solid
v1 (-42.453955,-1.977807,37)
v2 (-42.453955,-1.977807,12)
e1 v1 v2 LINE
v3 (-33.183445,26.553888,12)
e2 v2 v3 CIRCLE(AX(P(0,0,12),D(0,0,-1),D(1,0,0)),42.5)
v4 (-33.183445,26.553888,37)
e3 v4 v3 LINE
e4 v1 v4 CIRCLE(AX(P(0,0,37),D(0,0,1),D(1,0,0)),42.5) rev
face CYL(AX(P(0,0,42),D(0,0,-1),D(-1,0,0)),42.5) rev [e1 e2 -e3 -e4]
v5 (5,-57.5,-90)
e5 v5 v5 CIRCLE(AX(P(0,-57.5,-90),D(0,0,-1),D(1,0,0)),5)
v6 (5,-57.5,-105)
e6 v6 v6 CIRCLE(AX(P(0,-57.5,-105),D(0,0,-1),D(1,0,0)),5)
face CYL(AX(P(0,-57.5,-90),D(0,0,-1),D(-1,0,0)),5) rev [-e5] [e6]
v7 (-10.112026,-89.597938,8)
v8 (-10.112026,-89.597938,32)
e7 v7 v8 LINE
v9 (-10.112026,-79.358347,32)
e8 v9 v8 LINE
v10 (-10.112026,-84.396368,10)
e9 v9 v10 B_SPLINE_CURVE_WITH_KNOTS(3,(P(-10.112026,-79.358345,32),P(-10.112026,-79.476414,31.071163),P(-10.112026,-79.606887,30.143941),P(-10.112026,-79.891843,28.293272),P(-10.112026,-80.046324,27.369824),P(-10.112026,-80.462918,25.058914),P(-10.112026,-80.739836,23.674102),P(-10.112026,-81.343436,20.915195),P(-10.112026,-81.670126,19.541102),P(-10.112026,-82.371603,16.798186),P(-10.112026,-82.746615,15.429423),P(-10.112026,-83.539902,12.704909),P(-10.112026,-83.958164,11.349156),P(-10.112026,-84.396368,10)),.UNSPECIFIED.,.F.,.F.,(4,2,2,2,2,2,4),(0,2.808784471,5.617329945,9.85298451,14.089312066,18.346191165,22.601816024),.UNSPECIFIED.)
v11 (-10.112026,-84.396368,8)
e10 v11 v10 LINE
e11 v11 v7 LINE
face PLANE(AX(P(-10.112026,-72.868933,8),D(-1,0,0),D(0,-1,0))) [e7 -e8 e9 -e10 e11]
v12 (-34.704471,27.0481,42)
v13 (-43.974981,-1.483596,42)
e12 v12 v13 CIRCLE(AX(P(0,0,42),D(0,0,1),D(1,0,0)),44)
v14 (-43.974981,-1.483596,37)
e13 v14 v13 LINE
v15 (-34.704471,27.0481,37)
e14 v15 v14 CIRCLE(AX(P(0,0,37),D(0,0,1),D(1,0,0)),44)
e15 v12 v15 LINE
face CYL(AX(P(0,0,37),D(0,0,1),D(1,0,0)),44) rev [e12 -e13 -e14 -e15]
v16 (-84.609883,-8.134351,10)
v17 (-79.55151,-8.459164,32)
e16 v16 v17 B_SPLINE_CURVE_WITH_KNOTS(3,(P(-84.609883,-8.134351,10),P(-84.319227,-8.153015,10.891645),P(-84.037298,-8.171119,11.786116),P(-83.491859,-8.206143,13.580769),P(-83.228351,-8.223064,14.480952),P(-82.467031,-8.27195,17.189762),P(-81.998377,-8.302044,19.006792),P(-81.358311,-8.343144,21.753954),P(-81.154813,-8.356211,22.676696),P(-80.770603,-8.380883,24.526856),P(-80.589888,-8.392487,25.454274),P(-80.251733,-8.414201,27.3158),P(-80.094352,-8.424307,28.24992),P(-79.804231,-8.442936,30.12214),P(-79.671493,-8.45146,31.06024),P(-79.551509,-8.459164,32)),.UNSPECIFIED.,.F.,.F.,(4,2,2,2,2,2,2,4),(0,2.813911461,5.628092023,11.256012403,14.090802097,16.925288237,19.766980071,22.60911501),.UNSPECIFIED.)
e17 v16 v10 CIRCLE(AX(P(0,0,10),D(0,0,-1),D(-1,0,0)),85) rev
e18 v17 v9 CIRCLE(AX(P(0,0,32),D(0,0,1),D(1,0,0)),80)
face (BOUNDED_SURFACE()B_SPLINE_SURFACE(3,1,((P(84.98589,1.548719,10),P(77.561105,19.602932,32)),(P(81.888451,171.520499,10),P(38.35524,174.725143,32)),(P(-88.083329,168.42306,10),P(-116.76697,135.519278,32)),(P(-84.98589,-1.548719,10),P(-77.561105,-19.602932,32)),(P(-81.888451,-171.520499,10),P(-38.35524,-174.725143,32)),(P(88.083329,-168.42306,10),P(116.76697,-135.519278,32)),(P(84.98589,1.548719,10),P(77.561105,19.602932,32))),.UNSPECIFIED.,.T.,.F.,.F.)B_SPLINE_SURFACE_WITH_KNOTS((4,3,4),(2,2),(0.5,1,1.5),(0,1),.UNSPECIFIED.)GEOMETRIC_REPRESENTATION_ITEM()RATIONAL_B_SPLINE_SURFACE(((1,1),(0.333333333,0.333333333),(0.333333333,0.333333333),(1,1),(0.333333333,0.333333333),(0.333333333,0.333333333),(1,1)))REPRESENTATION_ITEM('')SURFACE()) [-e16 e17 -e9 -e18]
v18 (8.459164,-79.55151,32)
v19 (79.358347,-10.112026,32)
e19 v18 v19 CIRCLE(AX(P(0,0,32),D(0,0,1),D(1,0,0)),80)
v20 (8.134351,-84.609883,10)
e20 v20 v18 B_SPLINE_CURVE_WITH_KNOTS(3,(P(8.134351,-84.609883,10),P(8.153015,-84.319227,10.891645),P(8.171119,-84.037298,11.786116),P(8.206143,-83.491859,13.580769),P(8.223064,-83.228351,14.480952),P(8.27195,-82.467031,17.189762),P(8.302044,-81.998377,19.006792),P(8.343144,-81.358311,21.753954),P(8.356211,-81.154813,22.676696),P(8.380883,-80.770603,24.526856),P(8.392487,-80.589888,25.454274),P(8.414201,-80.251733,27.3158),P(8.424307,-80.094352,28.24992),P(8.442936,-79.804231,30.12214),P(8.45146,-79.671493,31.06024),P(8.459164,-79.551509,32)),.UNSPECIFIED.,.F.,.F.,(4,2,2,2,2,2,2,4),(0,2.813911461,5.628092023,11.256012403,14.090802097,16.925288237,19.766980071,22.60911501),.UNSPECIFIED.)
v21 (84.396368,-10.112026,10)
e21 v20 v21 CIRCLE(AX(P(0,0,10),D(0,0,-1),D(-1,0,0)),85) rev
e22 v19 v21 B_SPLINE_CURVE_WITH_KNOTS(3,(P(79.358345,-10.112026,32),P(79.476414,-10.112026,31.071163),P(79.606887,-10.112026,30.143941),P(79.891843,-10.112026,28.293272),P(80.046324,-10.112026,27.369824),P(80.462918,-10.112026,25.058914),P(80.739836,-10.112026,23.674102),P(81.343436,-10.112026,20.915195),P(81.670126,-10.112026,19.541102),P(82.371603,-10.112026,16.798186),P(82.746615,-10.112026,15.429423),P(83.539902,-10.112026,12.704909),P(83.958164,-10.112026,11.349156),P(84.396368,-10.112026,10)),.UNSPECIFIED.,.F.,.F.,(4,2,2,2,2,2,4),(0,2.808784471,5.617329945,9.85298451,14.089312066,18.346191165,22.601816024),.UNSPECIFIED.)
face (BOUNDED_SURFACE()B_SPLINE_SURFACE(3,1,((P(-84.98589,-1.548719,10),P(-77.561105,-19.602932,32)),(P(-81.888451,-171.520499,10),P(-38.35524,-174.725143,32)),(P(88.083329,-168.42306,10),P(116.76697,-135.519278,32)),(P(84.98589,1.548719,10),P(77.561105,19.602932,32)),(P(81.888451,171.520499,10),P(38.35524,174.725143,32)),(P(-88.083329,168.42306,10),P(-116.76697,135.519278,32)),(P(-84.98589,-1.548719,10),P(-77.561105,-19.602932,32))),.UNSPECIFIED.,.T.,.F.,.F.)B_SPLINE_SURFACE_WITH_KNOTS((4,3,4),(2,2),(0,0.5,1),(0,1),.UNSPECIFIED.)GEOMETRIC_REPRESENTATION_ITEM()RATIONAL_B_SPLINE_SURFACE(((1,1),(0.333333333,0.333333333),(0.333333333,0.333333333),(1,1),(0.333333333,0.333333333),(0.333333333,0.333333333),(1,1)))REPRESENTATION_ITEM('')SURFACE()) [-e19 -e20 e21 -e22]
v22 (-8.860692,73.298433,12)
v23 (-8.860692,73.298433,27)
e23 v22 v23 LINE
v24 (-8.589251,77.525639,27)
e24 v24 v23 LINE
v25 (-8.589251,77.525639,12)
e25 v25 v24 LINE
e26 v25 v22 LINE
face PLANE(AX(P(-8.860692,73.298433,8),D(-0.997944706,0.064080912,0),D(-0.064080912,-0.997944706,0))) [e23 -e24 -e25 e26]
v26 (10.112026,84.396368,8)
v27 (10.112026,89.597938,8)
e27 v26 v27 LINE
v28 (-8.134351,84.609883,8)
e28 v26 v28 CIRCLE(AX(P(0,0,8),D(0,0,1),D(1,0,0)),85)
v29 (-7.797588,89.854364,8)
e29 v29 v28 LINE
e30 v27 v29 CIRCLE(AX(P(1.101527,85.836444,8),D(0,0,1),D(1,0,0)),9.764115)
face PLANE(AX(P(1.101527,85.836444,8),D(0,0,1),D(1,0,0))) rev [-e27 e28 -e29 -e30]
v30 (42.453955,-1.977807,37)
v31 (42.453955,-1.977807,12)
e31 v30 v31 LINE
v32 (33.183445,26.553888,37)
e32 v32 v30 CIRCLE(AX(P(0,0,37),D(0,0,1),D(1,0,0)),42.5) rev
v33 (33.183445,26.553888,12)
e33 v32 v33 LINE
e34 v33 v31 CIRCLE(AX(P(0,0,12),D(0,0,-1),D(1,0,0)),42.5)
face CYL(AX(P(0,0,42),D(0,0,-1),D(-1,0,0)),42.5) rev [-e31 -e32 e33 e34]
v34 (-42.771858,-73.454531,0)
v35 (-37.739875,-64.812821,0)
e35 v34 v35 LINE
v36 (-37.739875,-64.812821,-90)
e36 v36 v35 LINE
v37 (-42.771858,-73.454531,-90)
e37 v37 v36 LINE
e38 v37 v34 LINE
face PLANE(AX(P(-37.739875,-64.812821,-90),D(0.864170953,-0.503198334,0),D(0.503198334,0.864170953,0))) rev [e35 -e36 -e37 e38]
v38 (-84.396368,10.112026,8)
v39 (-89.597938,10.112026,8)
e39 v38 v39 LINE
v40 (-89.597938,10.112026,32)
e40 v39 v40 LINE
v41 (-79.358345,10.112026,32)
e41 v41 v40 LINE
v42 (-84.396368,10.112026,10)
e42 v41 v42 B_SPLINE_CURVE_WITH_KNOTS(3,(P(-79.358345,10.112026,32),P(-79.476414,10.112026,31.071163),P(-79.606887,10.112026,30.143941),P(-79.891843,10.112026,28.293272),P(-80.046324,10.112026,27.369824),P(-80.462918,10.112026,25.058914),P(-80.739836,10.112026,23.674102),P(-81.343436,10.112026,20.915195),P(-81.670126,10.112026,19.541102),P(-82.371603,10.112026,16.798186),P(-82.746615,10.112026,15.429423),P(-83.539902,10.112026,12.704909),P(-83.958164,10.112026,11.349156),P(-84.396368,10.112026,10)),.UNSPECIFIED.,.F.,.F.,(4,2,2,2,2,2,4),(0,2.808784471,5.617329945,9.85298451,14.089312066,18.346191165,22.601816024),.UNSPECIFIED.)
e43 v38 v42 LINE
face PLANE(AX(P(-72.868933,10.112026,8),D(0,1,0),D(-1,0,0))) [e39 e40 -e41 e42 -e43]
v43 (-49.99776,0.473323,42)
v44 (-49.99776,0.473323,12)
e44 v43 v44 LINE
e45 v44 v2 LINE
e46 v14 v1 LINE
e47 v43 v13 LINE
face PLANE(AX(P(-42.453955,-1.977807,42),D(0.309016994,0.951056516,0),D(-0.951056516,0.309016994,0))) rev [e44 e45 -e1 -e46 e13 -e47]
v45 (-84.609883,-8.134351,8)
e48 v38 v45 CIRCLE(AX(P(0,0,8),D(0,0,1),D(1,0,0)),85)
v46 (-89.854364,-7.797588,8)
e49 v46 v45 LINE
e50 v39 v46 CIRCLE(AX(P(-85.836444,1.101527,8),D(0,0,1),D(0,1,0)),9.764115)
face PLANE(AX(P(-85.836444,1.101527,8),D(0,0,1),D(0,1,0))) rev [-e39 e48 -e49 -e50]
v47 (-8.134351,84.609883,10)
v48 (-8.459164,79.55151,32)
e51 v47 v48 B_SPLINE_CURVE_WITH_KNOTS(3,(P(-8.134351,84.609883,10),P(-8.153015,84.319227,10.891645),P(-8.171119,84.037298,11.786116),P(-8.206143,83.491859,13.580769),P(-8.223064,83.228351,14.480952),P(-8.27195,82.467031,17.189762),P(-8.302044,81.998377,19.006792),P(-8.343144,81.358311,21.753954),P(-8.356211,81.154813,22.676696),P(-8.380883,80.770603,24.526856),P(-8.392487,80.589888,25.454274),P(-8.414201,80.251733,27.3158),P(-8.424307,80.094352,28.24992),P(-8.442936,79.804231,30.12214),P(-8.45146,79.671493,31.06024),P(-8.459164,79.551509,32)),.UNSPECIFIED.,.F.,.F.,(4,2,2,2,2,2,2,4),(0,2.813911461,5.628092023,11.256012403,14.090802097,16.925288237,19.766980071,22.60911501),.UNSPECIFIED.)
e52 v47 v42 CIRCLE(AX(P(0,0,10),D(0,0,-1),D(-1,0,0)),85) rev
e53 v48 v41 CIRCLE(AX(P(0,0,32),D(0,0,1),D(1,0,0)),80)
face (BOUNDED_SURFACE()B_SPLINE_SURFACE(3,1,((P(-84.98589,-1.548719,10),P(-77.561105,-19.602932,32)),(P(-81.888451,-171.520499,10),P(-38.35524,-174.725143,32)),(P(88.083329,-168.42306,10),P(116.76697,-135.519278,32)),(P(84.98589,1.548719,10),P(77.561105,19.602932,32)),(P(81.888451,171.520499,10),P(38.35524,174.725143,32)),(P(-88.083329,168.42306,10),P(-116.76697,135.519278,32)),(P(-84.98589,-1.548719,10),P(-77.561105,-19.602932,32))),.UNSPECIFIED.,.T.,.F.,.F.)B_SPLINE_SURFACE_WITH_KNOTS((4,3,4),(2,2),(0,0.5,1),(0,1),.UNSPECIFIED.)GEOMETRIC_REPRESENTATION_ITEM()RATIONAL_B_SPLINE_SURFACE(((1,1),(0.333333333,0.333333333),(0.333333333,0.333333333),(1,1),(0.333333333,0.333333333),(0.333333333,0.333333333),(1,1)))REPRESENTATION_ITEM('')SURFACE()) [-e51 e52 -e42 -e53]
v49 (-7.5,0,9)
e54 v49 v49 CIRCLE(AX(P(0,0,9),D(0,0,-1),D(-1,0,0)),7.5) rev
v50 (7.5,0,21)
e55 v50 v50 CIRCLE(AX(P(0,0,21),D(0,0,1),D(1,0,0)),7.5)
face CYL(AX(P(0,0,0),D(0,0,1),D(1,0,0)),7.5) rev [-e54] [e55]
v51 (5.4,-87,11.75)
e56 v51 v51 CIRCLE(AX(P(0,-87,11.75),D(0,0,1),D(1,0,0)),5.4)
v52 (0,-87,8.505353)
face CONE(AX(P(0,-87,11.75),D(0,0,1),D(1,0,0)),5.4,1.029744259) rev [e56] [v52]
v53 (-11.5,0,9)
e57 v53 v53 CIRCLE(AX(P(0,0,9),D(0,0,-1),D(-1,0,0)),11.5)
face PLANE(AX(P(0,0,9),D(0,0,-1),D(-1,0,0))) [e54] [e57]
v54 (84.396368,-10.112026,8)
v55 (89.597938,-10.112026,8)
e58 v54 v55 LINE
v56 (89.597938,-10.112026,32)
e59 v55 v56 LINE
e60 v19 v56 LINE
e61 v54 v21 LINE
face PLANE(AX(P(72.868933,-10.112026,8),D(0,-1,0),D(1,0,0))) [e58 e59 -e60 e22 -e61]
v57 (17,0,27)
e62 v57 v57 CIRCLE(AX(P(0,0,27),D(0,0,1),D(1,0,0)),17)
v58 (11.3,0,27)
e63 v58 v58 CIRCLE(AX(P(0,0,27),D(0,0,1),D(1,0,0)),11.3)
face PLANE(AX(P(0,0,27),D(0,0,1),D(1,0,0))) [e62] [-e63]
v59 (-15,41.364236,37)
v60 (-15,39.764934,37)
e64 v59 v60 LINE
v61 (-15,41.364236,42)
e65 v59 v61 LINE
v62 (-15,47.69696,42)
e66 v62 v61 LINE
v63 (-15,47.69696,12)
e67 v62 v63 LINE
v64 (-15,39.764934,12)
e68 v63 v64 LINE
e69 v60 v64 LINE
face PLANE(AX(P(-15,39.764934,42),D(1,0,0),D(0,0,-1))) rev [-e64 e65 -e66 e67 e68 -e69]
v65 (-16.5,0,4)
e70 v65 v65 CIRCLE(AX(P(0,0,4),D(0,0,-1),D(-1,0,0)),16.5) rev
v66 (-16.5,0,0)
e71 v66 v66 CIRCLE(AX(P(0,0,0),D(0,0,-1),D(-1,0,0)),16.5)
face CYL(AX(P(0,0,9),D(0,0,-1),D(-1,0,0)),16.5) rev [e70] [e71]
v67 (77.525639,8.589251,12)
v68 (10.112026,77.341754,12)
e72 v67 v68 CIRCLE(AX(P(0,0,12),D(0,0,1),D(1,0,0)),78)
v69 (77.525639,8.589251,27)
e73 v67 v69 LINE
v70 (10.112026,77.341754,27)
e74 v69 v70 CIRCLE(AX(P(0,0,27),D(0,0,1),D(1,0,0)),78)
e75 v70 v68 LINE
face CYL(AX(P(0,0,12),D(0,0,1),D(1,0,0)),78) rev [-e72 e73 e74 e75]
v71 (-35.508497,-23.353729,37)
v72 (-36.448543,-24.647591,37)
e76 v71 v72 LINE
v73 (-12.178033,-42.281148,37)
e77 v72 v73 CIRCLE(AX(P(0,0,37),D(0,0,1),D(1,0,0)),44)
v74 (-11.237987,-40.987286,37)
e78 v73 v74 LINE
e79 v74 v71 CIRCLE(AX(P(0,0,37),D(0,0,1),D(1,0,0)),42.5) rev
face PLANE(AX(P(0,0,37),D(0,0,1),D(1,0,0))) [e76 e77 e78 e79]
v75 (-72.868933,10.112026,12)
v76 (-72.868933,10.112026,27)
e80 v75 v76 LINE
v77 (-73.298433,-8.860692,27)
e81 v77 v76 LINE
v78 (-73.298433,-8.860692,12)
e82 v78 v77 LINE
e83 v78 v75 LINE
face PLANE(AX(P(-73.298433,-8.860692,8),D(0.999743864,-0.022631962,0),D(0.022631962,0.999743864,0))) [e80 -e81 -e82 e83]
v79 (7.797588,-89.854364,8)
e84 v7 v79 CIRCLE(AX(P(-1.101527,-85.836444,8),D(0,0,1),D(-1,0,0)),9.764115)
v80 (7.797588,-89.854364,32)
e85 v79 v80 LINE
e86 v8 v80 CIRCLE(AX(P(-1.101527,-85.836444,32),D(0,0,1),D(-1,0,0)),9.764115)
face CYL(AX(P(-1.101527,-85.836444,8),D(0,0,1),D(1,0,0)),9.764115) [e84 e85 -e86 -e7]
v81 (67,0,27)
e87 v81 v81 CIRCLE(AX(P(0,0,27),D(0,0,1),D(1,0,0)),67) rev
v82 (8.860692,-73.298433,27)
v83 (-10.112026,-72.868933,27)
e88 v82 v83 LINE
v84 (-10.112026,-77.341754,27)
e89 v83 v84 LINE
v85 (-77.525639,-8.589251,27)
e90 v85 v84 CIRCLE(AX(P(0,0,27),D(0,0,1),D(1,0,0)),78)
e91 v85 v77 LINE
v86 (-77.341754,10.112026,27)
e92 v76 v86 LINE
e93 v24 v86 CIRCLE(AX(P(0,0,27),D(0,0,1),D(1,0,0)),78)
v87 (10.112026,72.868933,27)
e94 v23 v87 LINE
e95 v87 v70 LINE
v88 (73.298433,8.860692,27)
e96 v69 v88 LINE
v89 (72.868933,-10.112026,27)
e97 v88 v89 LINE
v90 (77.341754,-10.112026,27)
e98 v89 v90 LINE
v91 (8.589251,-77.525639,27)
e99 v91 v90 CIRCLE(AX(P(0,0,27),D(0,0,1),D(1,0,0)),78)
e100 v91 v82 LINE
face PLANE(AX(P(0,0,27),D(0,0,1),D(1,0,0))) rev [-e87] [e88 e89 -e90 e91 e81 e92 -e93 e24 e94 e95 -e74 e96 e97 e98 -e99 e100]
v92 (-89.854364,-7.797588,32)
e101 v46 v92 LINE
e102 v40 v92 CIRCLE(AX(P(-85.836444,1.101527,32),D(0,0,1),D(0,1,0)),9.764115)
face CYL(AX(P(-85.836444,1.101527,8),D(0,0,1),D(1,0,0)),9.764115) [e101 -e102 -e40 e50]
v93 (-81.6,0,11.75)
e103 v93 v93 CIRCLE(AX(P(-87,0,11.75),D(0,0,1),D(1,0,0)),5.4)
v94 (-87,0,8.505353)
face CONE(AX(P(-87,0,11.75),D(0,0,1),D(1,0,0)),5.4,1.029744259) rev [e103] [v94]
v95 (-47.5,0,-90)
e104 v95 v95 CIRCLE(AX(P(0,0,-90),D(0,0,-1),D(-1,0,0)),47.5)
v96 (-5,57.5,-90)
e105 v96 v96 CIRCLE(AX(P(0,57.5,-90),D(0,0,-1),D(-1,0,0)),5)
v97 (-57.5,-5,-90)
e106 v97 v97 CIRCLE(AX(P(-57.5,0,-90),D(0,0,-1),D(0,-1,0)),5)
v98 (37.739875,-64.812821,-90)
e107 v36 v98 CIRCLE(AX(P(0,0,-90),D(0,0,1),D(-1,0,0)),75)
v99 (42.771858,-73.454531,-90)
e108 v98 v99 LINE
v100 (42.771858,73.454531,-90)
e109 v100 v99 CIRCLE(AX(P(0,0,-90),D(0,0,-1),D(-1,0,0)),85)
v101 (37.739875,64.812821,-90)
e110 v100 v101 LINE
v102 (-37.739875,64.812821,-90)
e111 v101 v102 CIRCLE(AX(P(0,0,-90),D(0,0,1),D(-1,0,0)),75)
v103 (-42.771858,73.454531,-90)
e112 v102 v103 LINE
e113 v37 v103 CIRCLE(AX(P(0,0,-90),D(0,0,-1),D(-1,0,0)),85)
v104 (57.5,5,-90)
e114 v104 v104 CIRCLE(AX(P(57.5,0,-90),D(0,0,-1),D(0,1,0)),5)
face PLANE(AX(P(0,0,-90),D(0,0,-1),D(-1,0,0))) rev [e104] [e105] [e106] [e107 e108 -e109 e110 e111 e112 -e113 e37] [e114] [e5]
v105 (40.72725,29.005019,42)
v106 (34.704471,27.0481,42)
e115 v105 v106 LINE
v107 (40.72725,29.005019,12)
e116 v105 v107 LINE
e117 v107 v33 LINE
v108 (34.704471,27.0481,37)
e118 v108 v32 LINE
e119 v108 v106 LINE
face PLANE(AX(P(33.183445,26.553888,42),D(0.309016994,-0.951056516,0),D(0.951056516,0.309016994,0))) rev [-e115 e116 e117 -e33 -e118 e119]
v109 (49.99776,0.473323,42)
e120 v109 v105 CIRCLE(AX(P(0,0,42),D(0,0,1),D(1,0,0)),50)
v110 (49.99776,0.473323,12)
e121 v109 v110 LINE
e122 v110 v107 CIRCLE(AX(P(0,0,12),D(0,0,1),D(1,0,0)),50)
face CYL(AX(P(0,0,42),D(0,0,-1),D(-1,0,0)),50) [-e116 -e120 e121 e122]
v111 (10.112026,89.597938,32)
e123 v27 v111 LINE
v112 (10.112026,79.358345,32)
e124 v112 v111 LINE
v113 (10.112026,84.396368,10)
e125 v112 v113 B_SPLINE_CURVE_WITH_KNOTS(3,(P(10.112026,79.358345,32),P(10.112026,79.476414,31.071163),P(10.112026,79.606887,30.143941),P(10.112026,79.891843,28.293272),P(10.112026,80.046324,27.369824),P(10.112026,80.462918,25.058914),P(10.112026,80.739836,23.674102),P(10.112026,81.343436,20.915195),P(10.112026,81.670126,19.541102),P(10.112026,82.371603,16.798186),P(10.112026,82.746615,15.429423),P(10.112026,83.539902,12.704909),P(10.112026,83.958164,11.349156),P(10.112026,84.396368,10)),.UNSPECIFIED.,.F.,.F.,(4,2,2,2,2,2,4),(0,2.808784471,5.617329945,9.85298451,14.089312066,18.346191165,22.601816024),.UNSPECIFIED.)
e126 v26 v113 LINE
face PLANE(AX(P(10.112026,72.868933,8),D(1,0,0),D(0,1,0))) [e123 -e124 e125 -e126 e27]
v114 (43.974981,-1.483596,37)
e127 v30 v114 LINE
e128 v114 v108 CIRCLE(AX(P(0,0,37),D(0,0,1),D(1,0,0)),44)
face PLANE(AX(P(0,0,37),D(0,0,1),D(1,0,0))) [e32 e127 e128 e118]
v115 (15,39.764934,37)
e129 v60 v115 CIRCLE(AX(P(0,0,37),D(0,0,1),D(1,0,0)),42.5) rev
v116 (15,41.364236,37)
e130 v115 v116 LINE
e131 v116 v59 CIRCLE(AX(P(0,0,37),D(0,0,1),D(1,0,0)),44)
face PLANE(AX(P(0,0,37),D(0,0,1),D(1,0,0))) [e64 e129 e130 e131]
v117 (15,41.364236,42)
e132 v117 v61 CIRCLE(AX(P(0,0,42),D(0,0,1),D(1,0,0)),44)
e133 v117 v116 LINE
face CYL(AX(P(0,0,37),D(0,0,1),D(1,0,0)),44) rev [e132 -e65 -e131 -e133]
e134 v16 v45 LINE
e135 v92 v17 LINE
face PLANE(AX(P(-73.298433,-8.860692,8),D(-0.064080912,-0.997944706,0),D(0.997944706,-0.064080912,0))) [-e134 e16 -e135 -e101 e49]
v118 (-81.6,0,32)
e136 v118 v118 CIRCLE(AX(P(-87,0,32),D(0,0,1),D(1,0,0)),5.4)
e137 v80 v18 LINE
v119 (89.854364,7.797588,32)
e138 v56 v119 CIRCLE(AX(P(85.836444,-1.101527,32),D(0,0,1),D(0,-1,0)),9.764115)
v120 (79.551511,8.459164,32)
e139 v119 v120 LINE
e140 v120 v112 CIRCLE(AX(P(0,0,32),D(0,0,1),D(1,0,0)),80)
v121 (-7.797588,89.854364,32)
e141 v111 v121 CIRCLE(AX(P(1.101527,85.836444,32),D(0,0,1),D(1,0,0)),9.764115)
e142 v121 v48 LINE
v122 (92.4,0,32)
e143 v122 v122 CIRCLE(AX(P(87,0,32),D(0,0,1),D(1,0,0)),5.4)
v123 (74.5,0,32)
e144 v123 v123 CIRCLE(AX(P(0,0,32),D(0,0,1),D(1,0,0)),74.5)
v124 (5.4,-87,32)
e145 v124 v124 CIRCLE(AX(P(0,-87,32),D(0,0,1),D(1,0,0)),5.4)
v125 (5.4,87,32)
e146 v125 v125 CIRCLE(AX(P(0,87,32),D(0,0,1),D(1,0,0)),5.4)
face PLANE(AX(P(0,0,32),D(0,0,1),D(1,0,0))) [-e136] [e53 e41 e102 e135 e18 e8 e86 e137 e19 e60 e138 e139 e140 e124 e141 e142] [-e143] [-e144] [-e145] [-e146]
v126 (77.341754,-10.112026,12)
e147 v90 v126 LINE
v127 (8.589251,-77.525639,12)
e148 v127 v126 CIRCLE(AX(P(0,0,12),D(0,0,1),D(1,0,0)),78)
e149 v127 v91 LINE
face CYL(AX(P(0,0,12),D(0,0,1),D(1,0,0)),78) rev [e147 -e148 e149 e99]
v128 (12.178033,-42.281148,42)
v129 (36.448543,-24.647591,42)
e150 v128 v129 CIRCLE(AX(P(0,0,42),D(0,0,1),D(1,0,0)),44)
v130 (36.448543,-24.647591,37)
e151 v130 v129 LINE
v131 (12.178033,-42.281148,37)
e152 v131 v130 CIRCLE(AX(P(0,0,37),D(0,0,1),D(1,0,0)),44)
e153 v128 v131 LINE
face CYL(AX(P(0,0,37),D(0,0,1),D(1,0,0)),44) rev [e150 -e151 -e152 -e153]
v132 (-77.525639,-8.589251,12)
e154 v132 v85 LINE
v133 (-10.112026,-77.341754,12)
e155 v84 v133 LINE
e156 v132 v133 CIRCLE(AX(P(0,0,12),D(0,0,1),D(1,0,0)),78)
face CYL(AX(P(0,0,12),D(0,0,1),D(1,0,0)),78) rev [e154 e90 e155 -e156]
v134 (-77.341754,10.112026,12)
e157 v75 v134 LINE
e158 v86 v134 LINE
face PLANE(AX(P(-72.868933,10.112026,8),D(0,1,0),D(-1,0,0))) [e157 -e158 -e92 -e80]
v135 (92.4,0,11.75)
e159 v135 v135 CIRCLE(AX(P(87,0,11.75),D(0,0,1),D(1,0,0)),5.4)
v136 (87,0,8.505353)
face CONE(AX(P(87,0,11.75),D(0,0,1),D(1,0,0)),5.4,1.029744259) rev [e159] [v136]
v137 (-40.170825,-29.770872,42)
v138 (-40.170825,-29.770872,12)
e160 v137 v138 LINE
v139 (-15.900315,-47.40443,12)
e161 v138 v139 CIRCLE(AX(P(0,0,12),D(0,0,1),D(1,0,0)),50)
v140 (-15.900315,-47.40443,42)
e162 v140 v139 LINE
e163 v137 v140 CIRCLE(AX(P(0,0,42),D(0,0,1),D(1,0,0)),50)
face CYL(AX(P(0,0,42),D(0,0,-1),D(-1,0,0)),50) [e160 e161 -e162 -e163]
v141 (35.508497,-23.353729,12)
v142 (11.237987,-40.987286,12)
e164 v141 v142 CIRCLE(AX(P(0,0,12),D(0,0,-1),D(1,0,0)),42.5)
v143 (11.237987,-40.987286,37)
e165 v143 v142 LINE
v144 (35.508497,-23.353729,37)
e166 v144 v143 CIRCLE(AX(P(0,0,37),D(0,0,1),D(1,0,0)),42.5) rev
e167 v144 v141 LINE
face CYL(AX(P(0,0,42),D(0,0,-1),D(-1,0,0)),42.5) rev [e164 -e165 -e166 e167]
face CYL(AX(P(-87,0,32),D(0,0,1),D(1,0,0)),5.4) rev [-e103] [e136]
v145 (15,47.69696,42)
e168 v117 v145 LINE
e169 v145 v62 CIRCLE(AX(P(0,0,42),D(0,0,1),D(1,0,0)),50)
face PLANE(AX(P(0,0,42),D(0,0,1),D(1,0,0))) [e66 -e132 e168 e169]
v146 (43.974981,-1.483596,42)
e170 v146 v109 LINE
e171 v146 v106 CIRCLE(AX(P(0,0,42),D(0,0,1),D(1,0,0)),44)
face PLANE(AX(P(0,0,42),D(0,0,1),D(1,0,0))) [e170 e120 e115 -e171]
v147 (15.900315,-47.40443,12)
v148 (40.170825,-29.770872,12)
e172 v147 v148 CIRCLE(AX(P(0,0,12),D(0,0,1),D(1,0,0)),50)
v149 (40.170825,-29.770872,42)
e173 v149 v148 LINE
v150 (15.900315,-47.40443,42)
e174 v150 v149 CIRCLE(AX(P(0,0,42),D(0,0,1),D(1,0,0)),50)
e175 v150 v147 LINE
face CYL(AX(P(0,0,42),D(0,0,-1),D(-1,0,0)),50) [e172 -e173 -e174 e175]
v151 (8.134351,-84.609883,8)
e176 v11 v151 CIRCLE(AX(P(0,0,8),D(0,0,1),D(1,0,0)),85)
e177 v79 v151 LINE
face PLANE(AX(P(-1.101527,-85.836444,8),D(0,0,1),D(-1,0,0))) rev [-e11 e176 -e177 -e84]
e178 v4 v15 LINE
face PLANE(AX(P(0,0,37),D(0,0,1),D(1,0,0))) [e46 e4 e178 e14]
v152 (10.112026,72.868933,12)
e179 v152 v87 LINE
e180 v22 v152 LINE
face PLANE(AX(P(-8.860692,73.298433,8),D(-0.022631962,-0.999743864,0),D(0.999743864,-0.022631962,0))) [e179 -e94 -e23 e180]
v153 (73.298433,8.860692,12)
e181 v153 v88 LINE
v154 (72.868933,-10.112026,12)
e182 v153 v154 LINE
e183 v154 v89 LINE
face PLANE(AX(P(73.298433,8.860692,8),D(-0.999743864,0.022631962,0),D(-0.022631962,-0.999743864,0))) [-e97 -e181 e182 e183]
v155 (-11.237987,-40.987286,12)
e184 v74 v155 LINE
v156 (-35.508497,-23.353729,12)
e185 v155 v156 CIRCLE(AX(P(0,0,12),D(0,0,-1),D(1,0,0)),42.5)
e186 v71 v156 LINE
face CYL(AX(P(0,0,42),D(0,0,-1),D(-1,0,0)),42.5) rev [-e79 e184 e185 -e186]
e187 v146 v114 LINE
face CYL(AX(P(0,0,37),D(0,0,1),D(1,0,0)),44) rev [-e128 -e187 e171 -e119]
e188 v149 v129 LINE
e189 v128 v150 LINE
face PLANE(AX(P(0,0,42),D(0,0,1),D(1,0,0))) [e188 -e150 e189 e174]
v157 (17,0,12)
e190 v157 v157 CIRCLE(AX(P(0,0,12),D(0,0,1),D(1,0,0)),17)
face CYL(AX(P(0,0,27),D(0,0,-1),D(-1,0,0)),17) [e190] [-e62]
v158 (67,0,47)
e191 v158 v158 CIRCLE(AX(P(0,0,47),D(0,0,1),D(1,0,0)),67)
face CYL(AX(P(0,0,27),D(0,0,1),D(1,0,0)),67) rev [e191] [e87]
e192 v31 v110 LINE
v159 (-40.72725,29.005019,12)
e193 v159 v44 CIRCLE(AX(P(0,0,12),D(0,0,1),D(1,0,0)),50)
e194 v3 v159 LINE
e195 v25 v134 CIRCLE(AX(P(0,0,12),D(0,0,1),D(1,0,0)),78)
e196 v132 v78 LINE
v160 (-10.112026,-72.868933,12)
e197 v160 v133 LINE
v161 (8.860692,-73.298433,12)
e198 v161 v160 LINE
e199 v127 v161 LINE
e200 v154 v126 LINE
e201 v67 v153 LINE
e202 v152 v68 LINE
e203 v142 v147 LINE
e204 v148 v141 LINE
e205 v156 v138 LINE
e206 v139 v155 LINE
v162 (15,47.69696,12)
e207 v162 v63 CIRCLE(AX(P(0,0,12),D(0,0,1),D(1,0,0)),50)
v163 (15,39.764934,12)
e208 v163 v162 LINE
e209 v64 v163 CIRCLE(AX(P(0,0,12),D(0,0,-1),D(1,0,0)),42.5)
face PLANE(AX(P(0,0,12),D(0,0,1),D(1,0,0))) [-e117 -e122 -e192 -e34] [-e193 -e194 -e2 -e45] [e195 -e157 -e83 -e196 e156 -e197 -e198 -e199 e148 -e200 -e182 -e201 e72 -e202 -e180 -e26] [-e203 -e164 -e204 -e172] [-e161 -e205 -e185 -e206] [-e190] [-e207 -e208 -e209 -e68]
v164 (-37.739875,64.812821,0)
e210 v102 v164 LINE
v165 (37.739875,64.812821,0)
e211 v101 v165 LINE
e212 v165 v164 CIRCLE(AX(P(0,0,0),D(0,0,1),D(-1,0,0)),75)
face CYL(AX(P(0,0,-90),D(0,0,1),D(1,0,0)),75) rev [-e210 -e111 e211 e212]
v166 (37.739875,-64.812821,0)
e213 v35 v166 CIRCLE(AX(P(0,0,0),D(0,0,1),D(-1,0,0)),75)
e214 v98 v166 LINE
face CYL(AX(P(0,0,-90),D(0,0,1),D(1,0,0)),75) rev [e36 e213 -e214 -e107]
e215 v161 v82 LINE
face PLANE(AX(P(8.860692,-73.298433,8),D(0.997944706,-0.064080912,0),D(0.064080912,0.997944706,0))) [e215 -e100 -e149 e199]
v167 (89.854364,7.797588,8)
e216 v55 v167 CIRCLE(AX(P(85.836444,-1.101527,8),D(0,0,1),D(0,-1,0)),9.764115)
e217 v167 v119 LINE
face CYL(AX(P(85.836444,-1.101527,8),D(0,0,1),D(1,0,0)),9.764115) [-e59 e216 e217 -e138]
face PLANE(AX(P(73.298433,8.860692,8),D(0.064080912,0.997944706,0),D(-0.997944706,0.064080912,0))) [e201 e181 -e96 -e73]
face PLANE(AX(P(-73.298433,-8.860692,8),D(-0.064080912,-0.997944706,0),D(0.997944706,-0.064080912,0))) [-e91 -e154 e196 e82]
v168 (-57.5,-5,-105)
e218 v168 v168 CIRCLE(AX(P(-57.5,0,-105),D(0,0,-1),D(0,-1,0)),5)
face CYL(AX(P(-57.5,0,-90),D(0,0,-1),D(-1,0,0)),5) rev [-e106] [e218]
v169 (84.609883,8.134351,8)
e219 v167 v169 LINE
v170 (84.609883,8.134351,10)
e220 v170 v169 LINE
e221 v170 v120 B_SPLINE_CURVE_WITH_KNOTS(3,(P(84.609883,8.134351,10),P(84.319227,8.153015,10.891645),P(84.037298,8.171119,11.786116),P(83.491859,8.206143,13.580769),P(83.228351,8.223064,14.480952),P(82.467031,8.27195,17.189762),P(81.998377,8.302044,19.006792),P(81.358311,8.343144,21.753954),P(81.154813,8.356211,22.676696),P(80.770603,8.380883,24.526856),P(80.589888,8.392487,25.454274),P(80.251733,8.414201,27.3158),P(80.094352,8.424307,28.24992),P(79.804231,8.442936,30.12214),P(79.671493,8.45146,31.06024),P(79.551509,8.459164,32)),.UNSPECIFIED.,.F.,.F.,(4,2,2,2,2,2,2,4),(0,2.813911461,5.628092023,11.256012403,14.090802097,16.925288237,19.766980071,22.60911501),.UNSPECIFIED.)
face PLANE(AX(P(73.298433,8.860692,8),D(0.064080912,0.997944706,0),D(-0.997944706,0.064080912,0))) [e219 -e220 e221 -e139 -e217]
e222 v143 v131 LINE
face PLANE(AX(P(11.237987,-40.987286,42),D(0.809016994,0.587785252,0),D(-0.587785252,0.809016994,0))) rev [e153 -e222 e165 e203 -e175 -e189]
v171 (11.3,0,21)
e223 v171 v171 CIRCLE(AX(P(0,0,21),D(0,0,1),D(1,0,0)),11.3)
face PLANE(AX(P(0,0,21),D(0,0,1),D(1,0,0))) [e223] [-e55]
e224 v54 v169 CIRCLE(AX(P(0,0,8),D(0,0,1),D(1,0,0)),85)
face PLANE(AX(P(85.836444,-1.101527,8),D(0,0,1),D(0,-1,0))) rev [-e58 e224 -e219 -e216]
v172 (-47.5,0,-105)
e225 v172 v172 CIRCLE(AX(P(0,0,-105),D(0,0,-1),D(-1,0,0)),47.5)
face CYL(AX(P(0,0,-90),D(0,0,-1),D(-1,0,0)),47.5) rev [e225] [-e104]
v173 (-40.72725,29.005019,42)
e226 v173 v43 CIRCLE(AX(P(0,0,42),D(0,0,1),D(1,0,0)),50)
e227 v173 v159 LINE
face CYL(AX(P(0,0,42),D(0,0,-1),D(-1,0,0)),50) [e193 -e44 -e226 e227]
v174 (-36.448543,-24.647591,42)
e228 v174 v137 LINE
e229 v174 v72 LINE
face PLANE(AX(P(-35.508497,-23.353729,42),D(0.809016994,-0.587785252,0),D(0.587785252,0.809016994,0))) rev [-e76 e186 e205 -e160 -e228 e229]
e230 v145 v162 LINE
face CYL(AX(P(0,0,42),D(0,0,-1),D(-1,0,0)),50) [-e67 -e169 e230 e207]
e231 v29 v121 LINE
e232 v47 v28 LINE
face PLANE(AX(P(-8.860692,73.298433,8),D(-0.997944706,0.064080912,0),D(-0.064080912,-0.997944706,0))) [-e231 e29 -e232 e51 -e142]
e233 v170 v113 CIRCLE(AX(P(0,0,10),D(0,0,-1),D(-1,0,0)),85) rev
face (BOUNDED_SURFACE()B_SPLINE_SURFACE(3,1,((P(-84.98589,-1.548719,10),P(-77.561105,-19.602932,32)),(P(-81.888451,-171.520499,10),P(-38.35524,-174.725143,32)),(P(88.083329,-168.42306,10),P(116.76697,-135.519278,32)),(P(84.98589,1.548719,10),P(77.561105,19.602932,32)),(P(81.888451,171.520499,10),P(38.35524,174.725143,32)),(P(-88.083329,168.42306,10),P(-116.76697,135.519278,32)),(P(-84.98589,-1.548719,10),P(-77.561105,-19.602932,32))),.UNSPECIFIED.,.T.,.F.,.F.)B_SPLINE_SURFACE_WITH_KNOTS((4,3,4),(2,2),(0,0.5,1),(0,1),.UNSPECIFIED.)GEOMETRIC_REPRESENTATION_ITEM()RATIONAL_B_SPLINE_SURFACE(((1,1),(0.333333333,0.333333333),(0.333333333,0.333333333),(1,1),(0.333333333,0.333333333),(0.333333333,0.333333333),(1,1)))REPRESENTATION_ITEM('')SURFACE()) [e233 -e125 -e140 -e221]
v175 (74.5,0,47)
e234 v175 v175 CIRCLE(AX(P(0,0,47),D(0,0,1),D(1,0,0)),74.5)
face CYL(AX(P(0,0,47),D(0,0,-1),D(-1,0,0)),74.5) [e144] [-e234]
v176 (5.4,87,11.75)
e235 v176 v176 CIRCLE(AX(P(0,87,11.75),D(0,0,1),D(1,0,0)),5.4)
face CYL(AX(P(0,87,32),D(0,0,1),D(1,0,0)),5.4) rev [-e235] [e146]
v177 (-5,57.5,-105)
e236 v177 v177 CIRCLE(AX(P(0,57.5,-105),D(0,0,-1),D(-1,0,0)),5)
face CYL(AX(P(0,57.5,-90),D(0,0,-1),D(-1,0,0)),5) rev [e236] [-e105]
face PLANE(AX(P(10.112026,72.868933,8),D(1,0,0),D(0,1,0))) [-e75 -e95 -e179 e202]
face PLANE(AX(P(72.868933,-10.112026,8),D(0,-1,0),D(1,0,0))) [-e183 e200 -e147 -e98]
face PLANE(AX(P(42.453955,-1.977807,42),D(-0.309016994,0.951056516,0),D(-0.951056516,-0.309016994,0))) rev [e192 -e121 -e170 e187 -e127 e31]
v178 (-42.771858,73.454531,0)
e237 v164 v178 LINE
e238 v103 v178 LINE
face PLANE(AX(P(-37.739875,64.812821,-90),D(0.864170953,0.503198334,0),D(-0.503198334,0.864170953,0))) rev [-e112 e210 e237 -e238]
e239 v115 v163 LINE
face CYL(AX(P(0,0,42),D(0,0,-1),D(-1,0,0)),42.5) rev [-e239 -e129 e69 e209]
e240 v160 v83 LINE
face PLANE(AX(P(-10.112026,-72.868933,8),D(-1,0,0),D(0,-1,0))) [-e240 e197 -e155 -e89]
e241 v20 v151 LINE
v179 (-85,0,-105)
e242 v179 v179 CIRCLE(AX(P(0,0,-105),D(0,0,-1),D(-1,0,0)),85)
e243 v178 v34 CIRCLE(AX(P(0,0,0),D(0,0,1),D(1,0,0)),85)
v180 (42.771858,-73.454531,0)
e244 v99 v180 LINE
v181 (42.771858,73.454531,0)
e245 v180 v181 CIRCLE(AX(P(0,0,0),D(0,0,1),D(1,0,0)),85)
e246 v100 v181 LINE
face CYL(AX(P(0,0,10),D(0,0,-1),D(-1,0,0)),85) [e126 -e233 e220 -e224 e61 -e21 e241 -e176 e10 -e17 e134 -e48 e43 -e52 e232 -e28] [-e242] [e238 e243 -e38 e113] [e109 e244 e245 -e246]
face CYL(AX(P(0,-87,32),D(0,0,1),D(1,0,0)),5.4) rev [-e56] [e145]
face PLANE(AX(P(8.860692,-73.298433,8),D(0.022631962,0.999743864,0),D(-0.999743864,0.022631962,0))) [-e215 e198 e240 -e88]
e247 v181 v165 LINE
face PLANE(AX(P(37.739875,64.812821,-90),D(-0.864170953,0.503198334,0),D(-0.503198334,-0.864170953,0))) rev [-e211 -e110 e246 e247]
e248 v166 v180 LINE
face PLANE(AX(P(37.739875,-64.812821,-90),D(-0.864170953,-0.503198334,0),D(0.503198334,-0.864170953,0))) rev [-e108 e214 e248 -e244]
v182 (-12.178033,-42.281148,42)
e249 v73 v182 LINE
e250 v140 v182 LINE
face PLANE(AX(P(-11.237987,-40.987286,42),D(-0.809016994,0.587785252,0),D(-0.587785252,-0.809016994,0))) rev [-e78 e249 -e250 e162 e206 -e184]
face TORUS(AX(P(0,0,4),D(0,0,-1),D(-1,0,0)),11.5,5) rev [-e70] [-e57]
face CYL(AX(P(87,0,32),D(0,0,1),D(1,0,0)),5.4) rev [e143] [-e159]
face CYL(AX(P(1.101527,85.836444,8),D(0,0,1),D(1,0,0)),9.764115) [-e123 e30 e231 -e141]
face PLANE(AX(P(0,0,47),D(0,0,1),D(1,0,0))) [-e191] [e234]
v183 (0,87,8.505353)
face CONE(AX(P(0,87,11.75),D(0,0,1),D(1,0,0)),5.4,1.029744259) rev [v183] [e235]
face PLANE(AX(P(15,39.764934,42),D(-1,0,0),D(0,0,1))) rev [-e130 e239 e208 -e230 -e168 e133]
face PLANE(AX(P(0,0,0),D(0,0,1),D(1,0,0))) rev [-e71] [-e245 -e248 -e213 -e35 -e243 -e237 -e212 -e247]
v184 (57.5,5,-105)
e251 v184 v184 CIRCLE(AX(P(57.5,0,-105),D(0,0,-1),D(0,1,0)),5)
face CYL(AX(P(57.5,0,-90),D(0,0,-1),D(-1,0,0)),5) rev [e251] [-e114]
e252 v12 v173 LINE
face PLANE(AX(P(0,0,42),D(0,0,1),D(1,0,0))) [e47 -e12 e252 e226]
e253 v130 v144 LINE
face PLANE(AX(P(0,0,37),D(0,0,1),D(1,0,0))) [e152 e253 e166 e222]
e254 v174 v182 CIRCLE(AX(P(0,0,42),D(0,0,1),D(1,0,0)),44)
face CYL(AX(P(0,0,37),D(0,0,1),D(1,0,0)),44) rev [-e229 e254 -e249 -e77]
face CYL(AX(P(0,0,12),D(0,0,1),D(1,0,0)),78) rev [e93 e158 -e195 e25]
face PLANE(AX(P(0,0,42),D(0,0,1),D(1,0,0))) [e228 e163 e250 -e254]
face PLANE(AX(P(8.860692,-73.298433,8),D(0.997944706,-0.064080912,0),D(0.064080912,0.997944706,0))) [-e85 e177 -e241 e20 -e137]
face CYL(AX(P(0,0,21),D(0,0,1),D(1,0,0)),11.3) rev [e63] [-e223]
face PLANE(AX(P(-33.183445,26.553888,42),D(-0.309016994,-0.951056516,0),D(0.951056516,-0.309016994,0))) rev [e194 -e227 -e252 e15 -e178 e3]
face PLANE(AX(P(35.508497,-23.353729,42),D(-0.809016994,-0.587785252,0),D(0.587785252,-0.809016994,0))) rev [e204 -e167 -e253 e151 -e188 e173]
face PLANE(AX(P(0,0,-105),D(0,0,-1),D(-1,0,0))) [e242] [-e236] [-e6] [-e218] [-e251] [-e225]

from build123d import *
from build123d.topology import SkipClean

# Parameters (mm, degrees)
SKETCH1_R           = 85
BOSS_EXTRUDE1_DEPTH = 10
SKETCH4_R           = 74.5
BOSS_EXTRUDE2_DEPTH = 15
SKETCH5_R           = 67
CUT_EXTRUDE1_DEPTH  = 20
SKETCH6_R           = 78
CUT_EXTRUDE2_DEPTH  = 15
BOSS_EXTRUDE3_DEPTH = 24
CIRPATTERN1_COUNT   = 4
CIRPATTERN2_COUNT   = 4
SKETCH14_R          = 17
BOSS_EXTRUDE4_DEPTH = 15
SKETCH15_R          = 11.3
CUT_EXTRUDE3_DEPTH  = 6
SKETCH16_R          = 7.5
CUT_EXTRUDE4_DEPTH  = 138.676917333
BOSS_EXTRUDE5_DEPTH = 30
BOSS_EXTRUDE6_START = 90
BOSS_EXTRUDE6_DEPTH = 90
BOSS_EXTRUDE7_START = 15
SKETCH19_R          = 85
BOSS_EXTRUDE7_DEPTH = 15
SKETCH20_R          = 47.5
CUT_EXTRUDE5_DEPTH  = 15
SKETCH21_R          = 5
CUT_EXTRUDE6_DEPTH  = 15
CIRPATTERN3_COUNT   = 4
SKETCH22_R          = 16.5
CUT_EXTRUDE7_DEPTH  = 9
FILLET1_R           = 5
SKETCH23_R          = 44
CUT_EXTRUDE8_DEPTH  = 5


with BuildPart() as part:
    # Sketch1 → Boss-Extrude1 (new body)
    with BuildSketch(Plane.XY):
        Circle(SKETCH1_R)
    extrude(amount=BOSS_EXTRUDE1_DEPTH)

    # Loft1: read off the stored shape, not the designer's step
    # Loft1: loft between two sections, ruled curve by curve
    loft1_from = [
        Edge.make_bspline([(-84.985889817, -1.548719476, 10), (-81.888450866, -171.52049911, 10), (88.083328768, -168.423060158, 10), (84.985889817, 1.548719476, 10), (81.888450866, 171.52049911, 10), (-88.083328768, 168.423060158, 10), (-84.985889817, -1.548719476, 10)], [0, 0, 0, 0, 0.5, 0.5, 0.5, 1, 1, 1, 1], 3, [1, 0.333333333, 0.333333333, 1, 0.333333333, 0.333333333, 1]),
    ]
    loft1_to = [
        Edge.make_bspline([(-77.561105187, -19.602932488, 32), (-38.35524021, -174.725142863, 32), (116.766970164, -135.519277886, 32), (77.561105187, 19.602932488, 32), (38.35524021, 174.725142863, 32), (-116.766970164, 135.519277886, 32), (-77.561105187, -19.602932488, 32)], [0, 0, 0, 0, 0.5, 0.5, 0.5, 1, 1, 1, 1], 3, [1, 0.333333333, 0.333333333, 1, 0.333333333, 0.333333333, 1]),
    ]
    loft1 = Solid(Shell([*[Face.make_surface_from_curves(loft1_from[k], loft1_to[k]) for k in range(1)], Face(Wire(loft1_from)), Face(Wire(loft1_to))]))
    add(loft1)

    # Sketch4 → Boss-Extrude2 (add)
    with BuildSketch(Plane.XY.offset(32)):
        Circle(SKETCH4_R)
    extrude(amount=BOSS_EXTRUDE2_DEPTH)

    # Sketch5 → Cut-Extrude1 (cut)
    with BuildSketch(Plane.XY.offset(47)):
        Circle(SKETCH5_R)
    extrude(amount=-CUT_EXTRUDE1_DEPTH, mode=Mode.SUBTRACT)

    # Sketch6 → Cut-Extrude2 (cut)
    with BuildSketch(Plane.XY.offset(27)):
        Circle(SKETCH6_R)
    extrude(amount=-CUT_EXTRUDE2_DEPTH, mode=Mode.SUBTRACT)

    # Sketch7 → Boss-Extrude3 (add)
    with BuildSketch(Plane.XY.offset(32)):
        with BuildLine():
            Line((10.112026185, 72.868932946), (10.112026185, 89.597937942))
            ThreePointArc((10.112026185, 89.597937942), (1.241313299, 95.599557722), (-7.797588157, 89.854364291))
            Line((-7.797588157, 89.854364291), (-8.860692334, 73.2984328))
            Line((-8.860692334, 73.2984328), (10.112026185, 72.868932946))
        make_face()
    boss_extrude3 = extrude(amount=-BOSS_EXTRUDE3_DEPTH)

    # CirPattern1: Boss-Extrude3 ×4 about axis
    cirpattern1_axis = Axis((0, 0, 0), (0, 0, 1))
    for i in range(1, CIRPATTERN1_COUNT):
        add(boss_extrude3.rotate(cirpattern1_axis, i * 360 / CIRPATTERN1_COUNT))

    # Sketch13 → M12x1.25 Tapped Hole1 (revolve, cut)
    with BuildSketch(Plane(origin=(0, 87, 32), x_dir=(0, -1, 0), z_dir=(1, 0, 0))):
        Polygon((0, 0), (0, 23.494647343), (5.4, 20.25), (5.4, 0), align=None)
    m12x1_25_tapped_hole1 = revolve(axis=Axis((0, 87, 38.35), (0, 0, -1)), mode=Mode.SUBTRACT)

    # CirPattern2: M12x1.25 Tapped Hole1 ×4 about axis
    cirpattern2_axis = Axis((0, 0, 0), (0, 0, 1))
    for i in range(1, CIRPATTERN2_COUNT):
        add(m12x1_25_tapped_hole1.rotate(cirpattern2_axis, i * 360 / CIRPATTERN2_COUNT), mode=Mode.SUBTRACT)

    # Sketch14 → Boss-Extrude4 (add)
    with BuildSketch(Plane.XY.offset(12)):
        Circle(SKETCH14_R)
    extrude(amount=BOSS_EXTRUDE4_DEPTH)

    # Sketch15 → Cut-Extrude3 (cut)
    with BuildSketch(Plane.XY.offset(27)):
        Circle(SKETCH15_R)
    extrude(amount=-CUT_EXTRUDE3_DEPTH, mode=Mode.SUBTRACT)

    # Sketch16 → Cut-Extrude4 (cut, through all)
    with BuildSketch(Plane.XY.offset(21)):
        Circle(SKETCH16_R)
    extrude(amount=-CUT_EXTRUDE4_DEPTH, mode=Mode.SUBTRACT)

    # Sketch17 → Boss-Extrude5 (add)
    with BuildSketch(Plane.XY.offset(12)):
        with BuildLine():
            Line((33.183444972, 26.553888224), (40.727249767, 29.005018986))
            ThreePointArc((40.727249767, 29.005018986), (47.552825815, 15.450849719), (49.997759598, 0.473323497))
            Line((49.997759598, 0.473323497), (42.453954803, -1.977807265))
            ThreePointArc((42.453954803, -1.977807265), (40.419901943, 13.133222261), (33.183444972, 26.553888224))
        make_face()
        with BuildLine():
            Line((15, 39.764934301), (15, 47.696960071))
            ThreePointArc((15, 47.696960071), (0, 50), (-15, 47.696960071))
            Line((-15, 47.696960071), (-15, 39.764934301))
            ThreePointArc((-15, 39.764934301), (0, 42.5), (15, 39.764934301))
        make_face()
        with BuildLine():
            Line((35.508496856, -23.353728846), (40.170824624, -29.770872493))
            ThreePointArc((40.170824624, -29.770872493), (29.389262615, -40.450849719), (15.900314793, -47.404430062))
            Line((15.900314793, -47.404430062), (11.237987025, -40.987286414))
            ThreePointArc((11.237987025, -40.987286414), (24.980873222, -34.383222261), (35.508496856, -23.353728846))
        make_face()
        with BuildLine():
            Line((-11.237987025, -40.987286414), (-15.900314793, -47.404430062))
            ThreePointArc((-15.900314793, -47.404430062), (-29.389262615, -40.450849719), (-40.170824624, -29.770872493))
            Line((-40.170824624, -29.770872493), (-35.508496856, -23.353728846))
            ThreePointArc((-35.508496856, -23.353728846), (-24.980873222, -34.383222261), (-11.237987025, -40.987286414))
        make_face()
        with BuildLine():
            Line((-42.453954803, -1.977807265), (-49.997759598, 0.473323497))
            ThreePointArc((-49.997759598, 0.473323497), (-47.552825815, 15.450849719), (-40.727249767, 29.005018986))
            Line((-40.727249767, 29.005018986), (-33.183444972, 26.553888224))
            ThreePointArc((-33.183444972, 26.553888224), (-40.419901943, 13.133222261), (-42.453954803, -1.977807265))
        make_face()
    extrude(amount=BOSS_EXTRUDE5_DEPTH)

    # Sketch18 → Boss-Extrude6 (add)
    with SkipClean():  # the faces are left unmerged after this step: merging them gives an invalid solid
        with BuildSketch(Plane(origin=(0, 0, 0), x_dir=(-1, 0, 0), z_dir=(0, 0, -1)).offset(BOSS_EXTRUDE6_START)):
            with BuildLine():
                Line((37.739875069, 64.812821492), (42.771858411, 73.454531025))
                ThreePointArc((42.771858411, 73.454531025), (0, 85), (-42.771858411, 73.454531025))
                Line((-42.771858411, 73.454531025), (-37.739875069, 64.812821492))
                ThreePointArc((-37.739875069, 64.812821492), (0, 75), (37.739875069, 64.812821492))
            make_face()
            with BuildLine():
                Line((37.739875069, -64.812821492), (42.771858411, -73.454531025))
                ThreePointArc((42.771858411, -73.454531025), (0, -85), (-42.771858411, -73.454531025))
                Line((-42.771858411, -73.454531025), (-37.739875069, -64.812821492))
                ThreePointArc((-37.739875069, -64.812821492), (0, -75), (37.739875069, -64.812821492))
            make_face()
        extrude(amount=-BOSS_EXTRUDE6_DEPTH)

    # Sketch19 → Boss-Extrude7 (add)
    with BuildSketch(Plane(origin=(0, 0, -90), x_dir=(-1, 0, 0), z_dir=(0, 0, -1)).offset(BOSS_EXTRUDE7_START)):
        Circle(SKETCH19_R)
    extrude(amount=-BOSS_EXTRUDE7_DEPTH)

    # Sketch20 → Cut-Extrude5 (cut)
    with BuildSketch(Plane(origin=(0, 0, -105), x_dir=(-1, 0, 0), z_dir=(0, 0, -1))):
        Circle(SKETCH20_R)
    extrude(amount=-CUT_EXTRUDE5_DEPTH, mode=Mode.SUBTRACT)

    # Sketch21 → Cut-Extrude6 (cut)
    with BuildSketch(Plane(origin=(0, 0, -105), x_dir=(-1, 0, 0), z_dir=(0, 0, -1))):
        with Locations((0, 57.5)):
            Circle(SKETCH21_R)
    cut_extrude6 = extrude(amount=-CUT_EXTRUDE6_DEPTH, mode=Mode.SUBTRACT)

    # CirPattern3: Cut-Extrude6 ×4 about axis
    cirpattern3_axis = Axis((0, 0, 0), (0, 0, 1))
    for i in range(1, CIRPATTERN3_COUNT):
        add(cut_extrude6.rotate(cirpattern3_axis, i * 360 / CIRPATTERN3_COUNT), mode=Mode.SUBTRACT)

    # Sketch22 → Cut-Extrude7 (cut)
    with BuildSketch(Plane(origin=(0, 0, 0), x_dir=(-1, 0, 0), z_dir=(0, 0, -1))):
        Circle(SKETCH22_R)
    extrude(amount=-CUT_EXTRUDE7_DEPTH, mode=Mode.SUBTRACT)

    # Fillet1
    fillet1_edges = [part.edges().sort_by_distance(p)[0] for p in [
        (16.5, 0, 9),
    ]]
    fillet(fillet1_edges, radius=FILLET1_R)

    # Sketch23 → Cut-Extrude8 (cut)
    with SkipClean():  # the faces are left unmerged after this step: merging them gives an invalid solid
        with BuildSketch(Plane.XY.offset(42)):
            Circle(SKETCH23_R)
        extrude(amount=-CUT_EXTRUDE8_DEPTH, mode=Mode.SUBTRACT)


solid = part.part
